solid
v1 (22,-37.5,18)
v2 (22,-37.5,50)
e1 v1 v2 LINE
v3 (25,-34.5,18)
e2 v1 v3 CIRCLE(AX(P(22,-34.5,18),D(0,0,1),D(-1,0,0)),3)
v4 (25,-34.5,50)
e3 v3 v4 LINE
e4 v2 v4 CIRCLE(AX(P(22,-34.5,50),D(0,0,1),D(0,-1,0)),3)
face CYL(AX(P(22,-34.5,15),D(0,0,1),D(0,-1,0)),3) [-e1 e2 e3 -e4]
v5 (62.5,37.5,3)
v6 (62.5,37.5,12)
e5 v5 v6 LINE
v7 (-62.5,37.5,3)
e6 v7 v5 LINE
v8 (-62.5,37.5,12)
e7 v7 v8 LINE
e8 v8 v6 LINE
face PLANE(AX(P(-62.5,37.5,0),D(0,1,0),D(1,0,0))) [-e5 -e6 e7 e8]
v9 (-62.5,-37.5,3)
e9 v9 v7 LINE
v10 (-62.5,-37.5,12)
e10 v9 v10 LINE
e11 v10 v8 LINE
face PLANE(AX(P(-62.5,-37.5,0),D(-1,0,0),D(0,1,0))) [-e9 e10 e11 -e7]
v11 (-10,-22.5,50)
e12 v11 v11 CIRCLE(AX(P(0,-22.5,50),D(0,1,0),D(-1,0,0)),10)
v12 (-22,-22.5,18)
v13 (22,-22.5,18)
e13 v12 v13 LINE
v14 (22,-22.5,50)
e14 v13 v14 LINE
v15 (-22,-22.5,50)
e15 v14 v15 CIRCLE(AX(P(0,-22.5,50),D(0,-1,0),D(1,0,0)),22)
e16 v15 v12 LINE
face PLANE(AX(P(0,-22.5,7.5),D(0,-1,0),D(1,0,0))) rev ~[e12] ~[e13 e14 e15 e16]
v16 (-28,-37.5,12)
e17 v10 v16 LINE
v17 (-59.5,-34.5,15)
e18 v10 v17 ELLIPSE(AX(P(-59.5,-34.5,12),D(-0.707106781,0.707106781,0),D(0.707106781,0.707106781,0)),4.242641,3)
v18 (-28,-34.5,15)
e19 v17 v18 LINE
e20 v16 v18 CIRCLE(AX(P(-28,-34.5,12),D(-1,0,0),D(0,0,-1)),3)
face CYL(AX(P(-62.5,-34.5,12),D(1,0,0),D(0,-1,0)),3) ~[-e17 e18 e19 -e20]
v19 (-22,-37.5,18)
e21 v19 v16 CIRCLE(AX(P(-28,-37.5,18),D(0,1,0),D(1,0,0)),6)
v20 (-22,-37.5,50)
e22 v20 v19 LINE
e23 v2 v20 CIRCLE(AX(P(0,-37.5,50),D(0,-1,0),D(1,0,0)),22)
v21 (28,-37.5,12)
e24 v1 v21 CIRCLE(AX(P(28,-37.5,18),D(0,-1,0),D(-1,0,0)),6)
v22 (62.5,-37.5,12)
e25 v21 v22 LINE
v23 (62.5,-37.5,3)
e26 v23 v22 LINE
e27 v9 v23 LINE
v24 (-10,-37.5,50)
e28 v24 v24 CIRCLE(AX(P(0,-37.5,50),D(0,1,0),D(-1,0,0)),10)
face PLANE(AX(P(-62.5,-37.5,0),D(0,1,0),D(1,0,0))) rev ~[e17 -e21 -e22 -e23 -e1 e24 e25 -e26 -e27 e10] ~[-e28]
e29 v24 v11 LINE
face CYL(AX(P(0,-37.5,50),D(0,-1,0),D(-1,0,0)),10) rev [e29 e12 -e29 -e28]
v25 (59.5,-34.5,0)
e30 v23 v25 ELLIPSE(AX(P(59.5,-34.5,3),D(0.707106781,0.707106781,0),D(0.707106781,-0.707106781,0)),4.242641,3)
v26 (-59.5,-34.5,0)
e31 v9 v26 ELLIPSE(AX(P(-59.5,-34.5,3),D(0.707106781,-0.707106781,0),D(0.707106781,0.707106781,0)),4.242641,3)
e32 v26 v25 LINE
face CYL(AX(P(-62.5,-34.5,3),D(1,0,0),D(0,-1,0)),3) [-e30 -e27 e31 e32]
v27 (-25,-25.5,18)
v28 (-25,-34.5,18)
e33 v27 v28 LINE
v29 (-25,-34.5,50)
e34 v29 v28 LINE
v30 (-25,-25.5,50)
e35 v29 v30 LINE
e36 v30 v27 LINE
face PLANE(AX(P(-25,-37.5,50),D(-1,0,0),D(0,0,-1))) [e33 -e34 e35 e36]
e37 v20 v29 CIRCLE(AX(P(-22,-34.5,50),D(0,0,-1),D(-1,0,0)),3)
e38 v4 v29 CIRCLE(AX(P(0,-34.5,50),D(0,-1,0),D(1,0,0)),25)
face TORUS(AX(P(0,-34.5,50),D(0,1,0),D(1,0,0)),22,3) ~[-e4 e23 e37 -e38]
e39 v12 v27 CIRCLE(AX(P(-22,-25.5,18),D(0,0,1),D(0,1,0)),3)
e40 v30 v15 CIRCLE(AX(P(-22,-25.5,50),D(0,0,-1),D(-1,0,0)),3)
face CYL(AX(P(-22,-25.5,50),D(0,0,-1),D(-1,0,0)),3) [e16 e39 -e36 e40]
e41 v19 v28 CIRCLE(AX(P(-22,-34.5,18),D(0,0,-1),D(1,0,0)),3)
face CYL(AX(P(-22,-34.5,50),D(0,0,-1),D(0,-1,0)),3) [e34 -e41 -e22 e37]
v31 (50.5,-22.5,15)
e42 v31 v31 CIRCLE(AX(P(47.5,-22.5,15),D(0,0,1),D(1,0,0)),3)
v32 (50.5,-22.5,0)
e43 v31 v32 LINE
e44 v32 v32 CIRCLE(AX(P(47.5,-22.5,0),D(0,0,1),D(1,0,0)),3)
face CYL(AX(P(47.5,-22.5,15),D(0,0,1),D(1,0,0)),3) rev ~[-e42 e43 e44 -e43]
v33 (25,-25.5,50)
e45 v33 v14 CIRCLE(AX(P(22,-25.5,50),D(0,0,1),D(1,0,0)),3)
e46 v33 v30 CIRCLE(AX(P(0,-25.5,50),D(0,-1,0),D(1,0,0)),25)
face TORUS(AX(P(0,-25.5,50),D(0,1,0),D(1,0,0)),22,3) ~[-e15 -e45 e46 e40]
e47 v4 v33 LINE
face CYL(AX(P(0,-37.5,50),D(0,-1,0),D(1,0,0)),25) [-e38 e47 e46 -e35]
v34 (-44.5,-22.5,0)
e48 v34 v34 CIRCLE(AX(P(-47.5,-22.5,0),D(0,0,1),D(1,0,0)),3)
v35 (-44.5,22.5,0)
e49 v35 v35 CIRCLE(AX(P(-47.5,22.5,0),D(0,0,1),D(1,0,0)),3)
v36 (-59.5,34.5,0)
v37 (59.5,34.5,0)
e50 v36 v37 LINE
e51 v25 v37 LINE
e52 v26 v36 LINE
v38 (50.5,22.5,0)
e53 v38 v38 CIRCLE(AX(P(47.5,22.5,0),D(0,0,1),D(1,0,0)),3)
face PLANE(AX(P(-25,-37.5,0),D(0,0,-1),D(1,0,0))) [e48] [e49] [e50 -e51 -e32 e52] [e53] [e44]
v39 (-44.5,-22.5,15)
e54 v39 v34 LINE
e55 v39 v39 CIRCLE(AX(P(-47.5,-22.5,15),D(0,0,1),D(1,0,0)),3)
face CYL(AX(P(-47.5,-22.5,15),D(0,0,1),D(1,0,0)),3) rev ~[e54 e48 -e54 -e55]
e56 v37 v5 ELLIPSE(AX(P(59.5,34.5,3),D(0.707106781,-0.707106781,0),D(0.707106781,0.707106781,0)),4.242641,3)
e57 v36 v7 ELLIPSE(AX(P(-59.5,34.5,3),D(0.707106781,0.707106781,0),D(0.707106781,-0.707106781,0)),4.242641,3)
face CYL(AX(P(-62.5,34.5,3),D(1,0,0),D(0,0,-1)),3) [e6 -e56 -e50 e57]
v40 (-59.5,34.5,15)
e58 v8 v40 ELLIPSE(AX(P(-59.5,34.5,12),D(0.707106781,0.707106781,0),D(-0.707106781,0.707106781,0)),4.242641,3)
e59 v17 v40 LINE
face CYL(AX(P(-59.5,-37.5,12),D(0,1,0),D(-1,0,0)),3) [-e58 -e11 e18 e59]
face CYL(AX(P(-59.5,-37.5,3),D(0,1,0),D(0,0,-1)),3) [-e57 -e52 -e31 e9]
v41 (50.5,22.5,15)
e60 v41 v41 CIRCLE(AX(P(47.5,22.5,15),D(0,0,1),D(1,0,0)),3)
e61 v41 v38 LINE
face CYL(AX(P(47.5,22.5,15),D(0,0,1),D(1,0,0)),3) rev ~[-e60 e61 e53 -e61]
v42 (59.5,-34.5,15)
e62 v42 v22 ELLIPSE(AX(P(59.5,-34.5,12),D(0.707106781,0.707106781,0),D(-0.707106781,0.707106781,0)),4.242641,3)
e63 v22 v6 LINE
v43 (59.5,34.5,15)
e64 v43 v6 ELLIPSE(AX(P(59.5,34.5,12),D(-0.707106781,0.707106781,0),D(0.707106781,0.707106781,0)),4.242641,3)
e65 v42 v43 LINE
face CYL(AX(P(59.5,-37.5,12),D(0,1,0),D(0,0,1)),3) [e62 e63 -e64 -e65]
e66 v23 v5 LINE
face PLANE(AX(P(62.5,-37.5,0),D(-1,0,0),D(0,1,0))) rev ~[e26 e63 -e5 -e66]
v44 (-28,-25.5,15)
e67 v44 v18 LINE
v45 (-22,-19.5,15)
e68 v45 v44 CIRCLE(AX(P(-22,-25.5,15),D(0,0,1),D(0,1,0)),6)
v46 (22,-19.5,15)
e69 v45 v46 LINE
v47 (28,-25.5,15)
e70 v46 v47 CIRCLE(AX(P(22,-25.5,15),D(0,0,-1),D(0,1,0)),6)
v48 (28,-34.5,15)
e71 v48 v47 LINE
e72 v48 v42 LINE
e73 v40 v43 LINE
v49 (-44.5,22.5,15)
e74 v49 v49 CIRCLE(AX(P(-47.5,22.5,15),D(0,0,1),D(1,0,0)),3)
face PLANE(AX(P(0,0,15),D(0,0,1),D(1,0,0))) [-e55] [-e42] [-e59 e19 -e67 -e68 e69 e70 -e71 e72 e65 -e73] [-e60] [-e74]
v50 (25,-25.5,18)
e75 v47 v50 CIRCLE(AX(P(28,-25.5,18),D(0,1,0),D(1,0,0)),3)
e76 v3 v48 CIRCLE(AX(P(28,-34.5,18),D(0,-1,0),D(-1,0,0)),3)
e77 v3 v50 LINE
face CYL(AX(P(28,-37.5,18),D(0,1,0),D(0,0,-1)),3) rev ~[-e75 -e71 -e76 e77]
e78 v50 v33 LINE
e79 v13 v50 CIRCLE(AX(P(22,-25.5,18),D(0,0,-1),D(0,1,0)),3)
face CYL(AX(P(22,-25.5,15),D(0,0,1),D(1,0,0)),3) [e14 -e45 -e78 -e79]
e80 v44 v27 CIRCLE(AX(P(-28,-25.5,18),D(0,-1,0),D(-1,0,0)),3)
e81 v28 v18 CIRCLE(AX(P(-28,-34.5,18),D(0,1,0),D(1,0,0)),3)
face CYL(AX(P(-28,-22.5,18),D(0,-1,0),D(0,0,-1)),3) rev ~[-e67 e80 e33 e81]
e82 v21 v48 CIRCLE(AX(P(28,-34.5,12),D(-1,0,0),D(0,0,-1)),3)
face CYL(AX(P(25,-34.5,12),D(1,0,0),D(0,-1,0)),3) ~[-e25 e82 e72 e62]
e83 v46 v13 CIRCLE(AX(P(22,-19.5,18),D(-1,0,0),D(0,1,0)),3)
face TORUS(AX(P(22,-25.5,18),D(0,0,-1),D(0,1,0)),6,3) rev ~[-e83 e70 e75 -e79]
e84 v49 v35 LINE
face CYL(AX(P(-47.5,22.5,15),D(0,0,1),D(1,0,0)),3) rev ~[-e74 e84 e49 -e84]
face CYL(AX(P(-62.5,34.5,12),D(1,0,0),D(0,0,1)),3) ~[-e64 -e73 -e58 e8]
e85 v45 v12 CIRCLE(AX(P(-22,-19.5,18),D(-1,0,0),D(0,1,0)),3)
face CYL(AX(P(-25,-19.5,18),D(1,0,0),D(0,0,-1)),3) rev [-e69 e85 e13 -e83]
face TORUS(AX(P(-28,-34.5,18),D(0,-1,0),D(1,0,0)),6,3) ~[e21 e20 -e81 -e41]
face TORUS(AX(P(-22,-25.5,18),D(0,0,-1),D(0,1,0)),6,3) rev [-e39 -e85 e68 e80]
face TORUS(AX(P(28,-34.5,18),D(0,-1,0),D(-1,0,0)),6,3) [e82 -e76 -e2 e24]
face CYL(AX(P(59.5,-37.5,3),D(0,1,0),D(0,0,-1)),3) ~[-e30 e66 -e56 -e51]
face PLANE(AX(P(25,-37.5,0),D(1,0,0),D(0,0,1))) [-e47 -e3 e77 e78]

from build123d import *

# Parameters (mm, degrees)
F0_W     = 125
F0_H     = 75
F1_DEPTH = 15
F2_W     = 50
F2_H     = 15
F3_DEPTH = 15
F4_R     = 3
F5_DEPTH = 15.001
F6_R     = 3


with BuildPart() as f1:
    # F0 (on Top) → F1 (new body)
    with BuildSketch(Plane.XY):
        Rectangle(F0_W, F0_H)
    extrude(amount=F1_DEPTH)

    # F2 (on face) → F3 (join)
    with BuildSketch(Plane.XZ.offset(37.5)):
        with Locations((0, 7.5)):
            Rectangle(F2_W, F2_H)
        with BuildLine():
            Line((25, 15), (25, 50))
            ThreePointArc((25, 50), (0, 25), (-25, 50))
            Line((-25, 50), (-25, 15))
            Line((-25, 15), (25, 15))
        make_face()
        with BuildLine():
            ThreePointArc((-25, 50), (0, 25), (25, 50))
            Line((25, 50), (10, 50))
            ThreePointArc((10, 50), (0, 40), (-10, 50))
            Line((-10, 50), (-25, 50))
        make_face()
        with BuildLine():
            Line((10, 50), (25, 50))
            ThreePointArc((25, 50), (0, 75), (-25, 50))
            Line((-25, 50), (-10, 50))
            ThreePointArc((-10, 50), (0, 60), (10, 50))
        make_face()
    extrude(amount=-F3_DEPTH)

    # F4 (on face) → F5 (cut, through all)
    with BuildSketch(Plane.XY.offset(15)):
        with Locations((-47.5, 22.5)):
            Circle(F4_R)
        with Locations((-47.5, -22.5)):
            Circle(F4_R)
        with Locations((47.5, 22.5)):
            Circle(F4_R)
        with Locations((47.5, -22.5)):
            Circle(F4_R)
    extrude(amount=-F5_DEPTH, mode=Mode.SUBTRACT)

    # F6
    f6_edges = [f1.edges().sort_by_distance(p)[0] for p in [
        (-43.75, -37.5, 15),
        (-62.5, 0, 15),
        (0, 37.5, 15),
        (62.5, 0, 15),
        (43.75, -37.5, 15),
        (25, -30, 15),
        (-25, -30, 15),
        (-25, -22.5, 32.5),
        (0, -37.5, 0),
        (62.5, 0, 0),
        (0, 37.5, 0),
        (-62.5, 0, 0),
        (-25, -37.5, 32.5),
        (0, -37.5, 75),
        (25, -37.5, 32.5),
        (0, -22.5, 15),
        (0, -22.5, 75),
        (25, -22.5, 32.5),
    ]]
    fillet(f6_edges, radius=F6_R)


solid = f1.part
